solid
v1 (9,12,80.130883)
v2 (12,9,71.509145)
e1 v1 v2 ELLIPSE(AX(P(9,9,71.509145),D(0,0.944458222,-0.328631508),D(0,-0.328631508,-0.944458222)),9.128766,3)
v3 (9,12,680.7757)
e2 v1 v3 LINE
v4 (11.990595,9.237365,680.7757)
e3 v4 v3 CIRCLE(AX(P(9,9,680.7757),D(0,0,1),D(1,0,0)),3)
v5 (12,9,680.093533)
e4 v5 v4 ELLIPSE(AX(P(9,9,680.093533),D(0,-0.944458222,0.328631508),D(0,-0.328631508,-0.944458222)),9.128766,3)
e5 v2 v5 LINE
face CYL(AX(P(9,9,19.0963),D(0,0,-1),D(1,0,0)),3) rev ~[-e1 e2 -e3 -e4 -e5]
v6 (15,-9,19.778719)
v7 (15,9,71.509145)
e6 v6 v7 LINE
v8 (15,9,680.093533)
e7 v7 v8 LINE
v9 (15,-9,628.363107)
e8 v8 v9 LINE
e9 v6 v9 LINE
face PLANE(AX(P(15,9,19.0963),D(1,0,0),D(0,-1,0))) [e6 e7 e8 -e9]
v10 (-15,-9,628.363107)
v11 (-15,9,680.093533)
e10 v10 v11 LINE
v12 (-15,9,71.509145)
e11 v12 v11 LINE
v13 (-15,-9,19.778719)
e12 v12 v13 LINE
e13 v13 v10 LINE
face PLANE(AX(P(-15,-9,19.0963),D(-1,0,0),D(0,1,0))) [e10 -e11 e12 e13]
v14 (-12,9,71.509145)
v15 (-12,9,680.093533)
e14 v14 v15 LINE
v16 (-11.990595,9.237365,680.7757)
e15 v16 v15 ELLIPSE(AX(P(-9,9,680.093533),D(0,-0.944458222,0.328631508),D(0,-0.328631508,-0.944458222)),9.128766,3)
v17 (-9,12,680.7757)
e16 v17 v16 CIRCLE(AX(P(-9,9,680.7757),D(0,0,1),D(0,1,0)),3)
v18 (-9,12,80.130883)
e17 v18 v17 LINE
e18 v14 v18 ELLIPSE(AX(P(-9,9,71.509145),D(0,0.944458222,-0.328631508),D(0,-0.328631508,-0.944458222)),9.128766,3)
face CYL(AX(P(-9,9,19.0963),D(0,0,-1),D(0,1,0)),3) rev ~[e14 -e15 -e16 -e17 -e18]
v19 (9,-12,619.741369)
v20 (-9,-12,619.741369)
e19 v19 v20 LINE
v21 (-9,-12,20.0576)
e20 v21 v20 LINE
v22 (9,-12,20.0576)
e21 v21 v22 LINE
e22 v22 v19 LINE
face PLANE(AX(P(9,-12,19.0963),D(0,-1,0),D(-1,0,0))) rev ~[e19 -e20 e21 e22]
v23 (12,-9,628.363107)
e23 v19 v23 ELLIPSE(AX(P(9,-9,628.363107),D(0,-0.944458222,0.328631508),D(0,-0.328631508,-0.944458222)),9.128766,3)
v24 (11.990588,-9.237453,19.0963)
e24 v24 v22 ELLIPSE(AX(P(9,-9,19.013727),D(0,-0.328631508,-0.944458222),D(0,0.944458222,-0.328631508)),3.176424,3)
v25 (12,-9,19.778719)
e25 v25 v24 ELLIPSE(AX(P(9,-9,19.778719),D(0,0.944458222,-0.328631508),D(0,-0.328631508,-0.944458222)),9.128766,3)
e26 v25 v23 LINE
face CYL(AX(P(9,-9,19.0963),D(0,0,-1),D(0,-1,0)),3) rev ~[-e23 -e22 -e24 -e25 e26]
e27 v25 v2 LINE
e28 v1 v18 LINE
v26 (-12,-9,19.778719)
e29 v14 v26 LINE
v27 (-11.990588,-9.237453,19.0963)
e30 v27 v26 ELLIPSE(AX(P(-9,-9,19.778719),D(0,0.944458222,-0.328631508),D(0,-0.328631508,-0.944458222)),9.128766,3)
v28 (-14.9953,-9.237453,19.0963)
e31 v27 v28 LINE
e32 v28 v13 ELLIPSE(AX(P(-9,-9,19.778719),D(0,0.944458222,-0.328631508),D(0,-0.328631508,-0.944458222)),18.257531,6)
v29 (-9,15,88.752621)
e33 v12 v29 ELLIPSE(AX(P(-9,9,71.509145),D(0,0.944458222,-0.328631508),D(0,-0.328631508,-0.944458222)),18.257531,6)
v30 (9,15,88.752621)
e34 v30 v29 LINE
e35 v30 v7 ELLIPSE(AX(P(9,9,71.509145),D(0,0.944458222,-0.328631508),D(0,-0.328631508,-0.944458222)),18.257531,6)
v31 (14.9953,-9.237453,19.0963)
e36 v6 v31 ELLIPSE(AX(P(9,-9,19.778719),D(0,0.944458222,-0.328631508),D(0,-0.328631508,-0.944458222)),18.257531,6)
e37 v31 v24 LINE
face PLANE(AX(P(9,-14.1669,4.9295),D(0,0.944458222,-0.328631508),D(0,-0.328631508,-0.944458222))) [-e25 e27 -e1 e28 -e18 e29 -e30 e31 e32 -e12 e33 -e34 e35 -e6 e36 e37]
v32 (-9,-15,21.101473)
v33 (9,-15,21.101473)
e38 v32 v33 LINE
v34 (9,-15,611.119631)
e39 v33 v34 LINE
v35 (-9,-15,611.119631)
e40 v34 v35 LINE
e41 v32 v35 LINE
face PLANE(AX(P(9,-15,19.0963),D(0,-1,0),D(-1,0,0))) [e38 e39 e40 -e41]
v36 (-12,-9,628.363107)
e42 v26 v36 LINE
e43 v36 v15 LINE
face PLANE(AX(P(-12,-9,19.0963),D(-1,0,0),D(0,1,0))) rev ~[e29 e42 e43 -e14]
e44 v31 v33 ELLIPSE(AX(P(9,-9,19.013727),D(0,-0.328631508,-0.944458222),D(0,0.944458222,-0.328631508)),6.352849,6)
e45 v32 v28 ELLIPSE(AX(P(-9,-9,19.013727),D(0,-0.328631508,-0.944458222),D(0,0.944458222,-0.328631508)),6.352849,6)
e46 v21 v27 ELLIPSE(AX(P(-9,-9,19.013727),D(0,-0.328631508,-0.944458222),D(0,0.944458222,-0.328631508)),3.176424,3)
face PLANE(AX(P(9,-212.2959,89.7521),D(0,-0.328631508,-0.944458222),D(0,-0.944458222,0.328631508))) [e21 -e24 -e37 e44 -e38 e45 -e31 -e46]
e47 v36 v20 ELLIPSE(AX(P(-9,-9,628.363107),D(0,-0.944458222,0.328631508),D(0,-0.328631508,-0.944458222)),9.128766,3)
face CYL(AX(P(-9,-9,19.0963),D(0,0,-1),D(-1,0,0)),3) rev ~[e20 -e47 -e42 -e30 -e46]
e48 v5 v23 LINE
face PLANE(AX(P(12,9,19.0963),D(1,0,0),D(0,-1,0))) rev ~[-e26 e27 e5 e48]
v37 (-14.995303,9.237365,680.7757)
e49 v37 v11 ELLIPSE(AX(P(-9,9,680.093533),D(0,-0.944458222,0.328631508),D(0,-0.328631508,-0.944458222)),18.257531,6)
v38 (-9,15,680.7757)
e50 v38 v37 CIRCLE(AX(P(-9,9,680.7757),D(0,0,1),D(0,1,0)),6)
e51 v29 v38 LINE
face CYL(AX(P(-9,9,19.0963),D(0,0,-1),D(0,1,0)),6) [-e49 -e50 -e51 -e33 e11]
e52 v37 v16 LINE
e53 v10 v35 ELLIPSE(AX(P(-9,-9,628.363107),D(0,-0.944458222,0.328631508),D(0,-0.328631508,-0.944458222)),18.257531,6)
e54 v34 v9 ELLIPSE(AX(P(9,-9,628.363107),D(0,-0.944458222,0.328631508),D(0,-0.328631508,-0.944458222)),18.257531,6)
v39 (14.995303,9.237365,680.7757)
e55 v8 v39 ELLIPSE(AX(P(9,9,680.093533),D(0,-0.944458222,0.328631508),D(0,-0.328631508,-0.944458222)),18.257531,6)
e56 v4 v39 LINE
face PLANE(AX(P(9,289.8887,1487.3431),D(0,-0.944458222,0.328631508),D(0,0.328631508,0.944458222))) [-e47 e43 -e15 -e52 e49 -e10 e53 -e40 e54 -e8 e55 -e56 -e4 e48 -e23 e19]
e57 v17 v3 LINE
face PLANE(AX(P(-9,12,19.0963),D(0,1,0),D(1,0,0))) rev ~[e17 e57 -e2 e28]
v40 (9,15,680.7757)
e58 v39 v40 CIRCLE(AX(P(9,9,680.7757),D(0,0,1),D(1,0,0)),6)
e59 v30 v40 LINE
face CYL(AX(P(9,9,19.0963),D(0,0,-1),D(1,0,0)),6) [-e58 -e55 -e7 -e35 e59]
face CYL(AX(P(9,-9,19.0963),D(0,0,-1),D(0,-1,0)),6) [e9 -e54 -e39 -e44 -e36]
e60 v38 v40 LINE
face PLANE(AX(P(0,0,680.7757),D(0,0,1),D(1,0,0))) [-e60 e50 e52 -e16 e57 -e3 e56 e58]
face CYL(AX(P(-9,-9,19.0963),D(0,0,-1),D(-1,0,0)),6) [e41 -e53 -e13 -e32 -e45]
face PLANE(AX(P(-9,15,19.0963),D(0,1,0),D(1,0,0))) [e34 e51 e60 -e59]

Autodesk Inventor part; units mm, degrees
ref_plane "Start Plane" through (0, 0, 19.0963) normal (0, 0, 1) x (1, 0, 0)
ref_plane "End Plane" through (0, 0, 680.7758) normal (0, 0, 1) x (1, 0, 0)
sketch "Sketch" plane through (0, 0, 0) normal (0, 0, 1) x (1, 0, 0)
  line L0 (-15, -9) -> (-15, 9)
  line L1 (-9, 15) -> (9, 15)
  line L2 (15, 9) -> (15, -9)
  line L3 (9, -15) -> (-9, -15)
  arc A0 (-15, -9) -> (-9, -15) centre (-9, -9) ccw
  arc A1 (-9, 15) -> (-15, 9) centre (-9, 9) ccw
  arc A2 (15, 9) -> (9, 15) centre (9, 9) ccw
  arc A3 (9, -15) -> (15, -9) centre (9, -9) ccw
  arc A4 (-9, 12) -> (-12, 9) centre (-9, 9) ccw
  line L4 (-9, 12) -> (9, 12)
  arc A5 (12, 9) -> (9, 12) centre (9, 9) ccw
  line L5 (12, 9) -> (12, -9)
  arc A6 (9, -12) -> (12, -9) centre (9, -9) ccw
  line L6 (9, -12) -> (-9, -12)
  arc A7 (-12, -9) -> (-9, -12) centre (-9, -9) ccw
  line L7 (-12, -9) -> (-12, 9)
  line L8 (0, 22.7397) -> (0, -22.7397) construction
  line L9 (-22.7397, 0) -> (22.7397, 0) construction
  dimension "d7" = 6
  dimension "d10" = 30
  dimension "d11" = 30
  dimension "d12" = 3
  dimension "d15" = 15
  dimension "d16" = 15
extrude "Body" add sketch "Sketch" along normal up to surface (661.6794 mm away) from surface at 19.0963
sketch "Sketch3" plane through (0, 0, 0) normal (0, 0, 1) x (1, 0, 0)
  line L0 (0, 0) -> (10, 0)
ref_plane "Work Plane3" through (0, 0, 0) normal (0, -1, 0) x (1, 0, 0)
ref_plane "Work Plane4" through (9, 289.8887, 1487.3431) normal (0, -0.9444582, 0.3286315) x (1, 0, 0)
split "Split1" plane through (9, 289.8887, 1487.3431) removes the side toward (0, -0.9444582, 0.3286315)
ref_plane "Work Plane5" through (9, -14.1669, 4.9295) normal (0, 0.9444582, -0.3286315) x (1, 0, 0)
split "Split2" plane through (9, -14.1669, 4.9295) removes the side toward (0, 0.9444582, -0.3286315)
ref_plane "Work Plane7" through (9, -212.2959, 89.7521) normal (0, -0.3286315, -0.9444582) x (1, 0, 0)
split "Split4" plane through (9, -212.2959, 89.7521) removes the side toward (0, -0.3286315, -0.9444582)
sketch "Sketch4" plane through (0, 0, 0) normal (0, -1, 0) x (1, 0, 0)
  line L0 (-2, 19.0963) -> (12, 19.0963) projected
  line L1 (-2, 680.7758) -> (12, 680.7758) projected
  dimension "d18" = 661.6794
equation "\"d7\" = G_IR"
equation "\"d10\" = G_H"
equation "\"d11\" = G_W"
equation "\"d12\" = G_T"
equation "\"d15\" = 0.5 * d10"
equation "\"d16\" = 0.5 * d11"
equation "\"d3\" = G_L"
equation "\"G_W\" = 30"
equation "\"G_H\" = 30"
equation "\"G_T\" = 3"
equation "\"G_IR\" = 6"
equation "\"G_L\" = d18"
equation "\"G_OFFSET_START\" = -19.09635"
equation "\"G_OFFSET_END\" = -19.09635"
equation "\"d13\" = -G_OFFSET_START"
equation "\"d14\" = G_OFFSET_END + B_L"
equation "\"B_L\" = 699.87213"
properties part number "DIN EN 10219-2 - 30 x 30 x 3  - 661.68" material "Steel, Mild"
